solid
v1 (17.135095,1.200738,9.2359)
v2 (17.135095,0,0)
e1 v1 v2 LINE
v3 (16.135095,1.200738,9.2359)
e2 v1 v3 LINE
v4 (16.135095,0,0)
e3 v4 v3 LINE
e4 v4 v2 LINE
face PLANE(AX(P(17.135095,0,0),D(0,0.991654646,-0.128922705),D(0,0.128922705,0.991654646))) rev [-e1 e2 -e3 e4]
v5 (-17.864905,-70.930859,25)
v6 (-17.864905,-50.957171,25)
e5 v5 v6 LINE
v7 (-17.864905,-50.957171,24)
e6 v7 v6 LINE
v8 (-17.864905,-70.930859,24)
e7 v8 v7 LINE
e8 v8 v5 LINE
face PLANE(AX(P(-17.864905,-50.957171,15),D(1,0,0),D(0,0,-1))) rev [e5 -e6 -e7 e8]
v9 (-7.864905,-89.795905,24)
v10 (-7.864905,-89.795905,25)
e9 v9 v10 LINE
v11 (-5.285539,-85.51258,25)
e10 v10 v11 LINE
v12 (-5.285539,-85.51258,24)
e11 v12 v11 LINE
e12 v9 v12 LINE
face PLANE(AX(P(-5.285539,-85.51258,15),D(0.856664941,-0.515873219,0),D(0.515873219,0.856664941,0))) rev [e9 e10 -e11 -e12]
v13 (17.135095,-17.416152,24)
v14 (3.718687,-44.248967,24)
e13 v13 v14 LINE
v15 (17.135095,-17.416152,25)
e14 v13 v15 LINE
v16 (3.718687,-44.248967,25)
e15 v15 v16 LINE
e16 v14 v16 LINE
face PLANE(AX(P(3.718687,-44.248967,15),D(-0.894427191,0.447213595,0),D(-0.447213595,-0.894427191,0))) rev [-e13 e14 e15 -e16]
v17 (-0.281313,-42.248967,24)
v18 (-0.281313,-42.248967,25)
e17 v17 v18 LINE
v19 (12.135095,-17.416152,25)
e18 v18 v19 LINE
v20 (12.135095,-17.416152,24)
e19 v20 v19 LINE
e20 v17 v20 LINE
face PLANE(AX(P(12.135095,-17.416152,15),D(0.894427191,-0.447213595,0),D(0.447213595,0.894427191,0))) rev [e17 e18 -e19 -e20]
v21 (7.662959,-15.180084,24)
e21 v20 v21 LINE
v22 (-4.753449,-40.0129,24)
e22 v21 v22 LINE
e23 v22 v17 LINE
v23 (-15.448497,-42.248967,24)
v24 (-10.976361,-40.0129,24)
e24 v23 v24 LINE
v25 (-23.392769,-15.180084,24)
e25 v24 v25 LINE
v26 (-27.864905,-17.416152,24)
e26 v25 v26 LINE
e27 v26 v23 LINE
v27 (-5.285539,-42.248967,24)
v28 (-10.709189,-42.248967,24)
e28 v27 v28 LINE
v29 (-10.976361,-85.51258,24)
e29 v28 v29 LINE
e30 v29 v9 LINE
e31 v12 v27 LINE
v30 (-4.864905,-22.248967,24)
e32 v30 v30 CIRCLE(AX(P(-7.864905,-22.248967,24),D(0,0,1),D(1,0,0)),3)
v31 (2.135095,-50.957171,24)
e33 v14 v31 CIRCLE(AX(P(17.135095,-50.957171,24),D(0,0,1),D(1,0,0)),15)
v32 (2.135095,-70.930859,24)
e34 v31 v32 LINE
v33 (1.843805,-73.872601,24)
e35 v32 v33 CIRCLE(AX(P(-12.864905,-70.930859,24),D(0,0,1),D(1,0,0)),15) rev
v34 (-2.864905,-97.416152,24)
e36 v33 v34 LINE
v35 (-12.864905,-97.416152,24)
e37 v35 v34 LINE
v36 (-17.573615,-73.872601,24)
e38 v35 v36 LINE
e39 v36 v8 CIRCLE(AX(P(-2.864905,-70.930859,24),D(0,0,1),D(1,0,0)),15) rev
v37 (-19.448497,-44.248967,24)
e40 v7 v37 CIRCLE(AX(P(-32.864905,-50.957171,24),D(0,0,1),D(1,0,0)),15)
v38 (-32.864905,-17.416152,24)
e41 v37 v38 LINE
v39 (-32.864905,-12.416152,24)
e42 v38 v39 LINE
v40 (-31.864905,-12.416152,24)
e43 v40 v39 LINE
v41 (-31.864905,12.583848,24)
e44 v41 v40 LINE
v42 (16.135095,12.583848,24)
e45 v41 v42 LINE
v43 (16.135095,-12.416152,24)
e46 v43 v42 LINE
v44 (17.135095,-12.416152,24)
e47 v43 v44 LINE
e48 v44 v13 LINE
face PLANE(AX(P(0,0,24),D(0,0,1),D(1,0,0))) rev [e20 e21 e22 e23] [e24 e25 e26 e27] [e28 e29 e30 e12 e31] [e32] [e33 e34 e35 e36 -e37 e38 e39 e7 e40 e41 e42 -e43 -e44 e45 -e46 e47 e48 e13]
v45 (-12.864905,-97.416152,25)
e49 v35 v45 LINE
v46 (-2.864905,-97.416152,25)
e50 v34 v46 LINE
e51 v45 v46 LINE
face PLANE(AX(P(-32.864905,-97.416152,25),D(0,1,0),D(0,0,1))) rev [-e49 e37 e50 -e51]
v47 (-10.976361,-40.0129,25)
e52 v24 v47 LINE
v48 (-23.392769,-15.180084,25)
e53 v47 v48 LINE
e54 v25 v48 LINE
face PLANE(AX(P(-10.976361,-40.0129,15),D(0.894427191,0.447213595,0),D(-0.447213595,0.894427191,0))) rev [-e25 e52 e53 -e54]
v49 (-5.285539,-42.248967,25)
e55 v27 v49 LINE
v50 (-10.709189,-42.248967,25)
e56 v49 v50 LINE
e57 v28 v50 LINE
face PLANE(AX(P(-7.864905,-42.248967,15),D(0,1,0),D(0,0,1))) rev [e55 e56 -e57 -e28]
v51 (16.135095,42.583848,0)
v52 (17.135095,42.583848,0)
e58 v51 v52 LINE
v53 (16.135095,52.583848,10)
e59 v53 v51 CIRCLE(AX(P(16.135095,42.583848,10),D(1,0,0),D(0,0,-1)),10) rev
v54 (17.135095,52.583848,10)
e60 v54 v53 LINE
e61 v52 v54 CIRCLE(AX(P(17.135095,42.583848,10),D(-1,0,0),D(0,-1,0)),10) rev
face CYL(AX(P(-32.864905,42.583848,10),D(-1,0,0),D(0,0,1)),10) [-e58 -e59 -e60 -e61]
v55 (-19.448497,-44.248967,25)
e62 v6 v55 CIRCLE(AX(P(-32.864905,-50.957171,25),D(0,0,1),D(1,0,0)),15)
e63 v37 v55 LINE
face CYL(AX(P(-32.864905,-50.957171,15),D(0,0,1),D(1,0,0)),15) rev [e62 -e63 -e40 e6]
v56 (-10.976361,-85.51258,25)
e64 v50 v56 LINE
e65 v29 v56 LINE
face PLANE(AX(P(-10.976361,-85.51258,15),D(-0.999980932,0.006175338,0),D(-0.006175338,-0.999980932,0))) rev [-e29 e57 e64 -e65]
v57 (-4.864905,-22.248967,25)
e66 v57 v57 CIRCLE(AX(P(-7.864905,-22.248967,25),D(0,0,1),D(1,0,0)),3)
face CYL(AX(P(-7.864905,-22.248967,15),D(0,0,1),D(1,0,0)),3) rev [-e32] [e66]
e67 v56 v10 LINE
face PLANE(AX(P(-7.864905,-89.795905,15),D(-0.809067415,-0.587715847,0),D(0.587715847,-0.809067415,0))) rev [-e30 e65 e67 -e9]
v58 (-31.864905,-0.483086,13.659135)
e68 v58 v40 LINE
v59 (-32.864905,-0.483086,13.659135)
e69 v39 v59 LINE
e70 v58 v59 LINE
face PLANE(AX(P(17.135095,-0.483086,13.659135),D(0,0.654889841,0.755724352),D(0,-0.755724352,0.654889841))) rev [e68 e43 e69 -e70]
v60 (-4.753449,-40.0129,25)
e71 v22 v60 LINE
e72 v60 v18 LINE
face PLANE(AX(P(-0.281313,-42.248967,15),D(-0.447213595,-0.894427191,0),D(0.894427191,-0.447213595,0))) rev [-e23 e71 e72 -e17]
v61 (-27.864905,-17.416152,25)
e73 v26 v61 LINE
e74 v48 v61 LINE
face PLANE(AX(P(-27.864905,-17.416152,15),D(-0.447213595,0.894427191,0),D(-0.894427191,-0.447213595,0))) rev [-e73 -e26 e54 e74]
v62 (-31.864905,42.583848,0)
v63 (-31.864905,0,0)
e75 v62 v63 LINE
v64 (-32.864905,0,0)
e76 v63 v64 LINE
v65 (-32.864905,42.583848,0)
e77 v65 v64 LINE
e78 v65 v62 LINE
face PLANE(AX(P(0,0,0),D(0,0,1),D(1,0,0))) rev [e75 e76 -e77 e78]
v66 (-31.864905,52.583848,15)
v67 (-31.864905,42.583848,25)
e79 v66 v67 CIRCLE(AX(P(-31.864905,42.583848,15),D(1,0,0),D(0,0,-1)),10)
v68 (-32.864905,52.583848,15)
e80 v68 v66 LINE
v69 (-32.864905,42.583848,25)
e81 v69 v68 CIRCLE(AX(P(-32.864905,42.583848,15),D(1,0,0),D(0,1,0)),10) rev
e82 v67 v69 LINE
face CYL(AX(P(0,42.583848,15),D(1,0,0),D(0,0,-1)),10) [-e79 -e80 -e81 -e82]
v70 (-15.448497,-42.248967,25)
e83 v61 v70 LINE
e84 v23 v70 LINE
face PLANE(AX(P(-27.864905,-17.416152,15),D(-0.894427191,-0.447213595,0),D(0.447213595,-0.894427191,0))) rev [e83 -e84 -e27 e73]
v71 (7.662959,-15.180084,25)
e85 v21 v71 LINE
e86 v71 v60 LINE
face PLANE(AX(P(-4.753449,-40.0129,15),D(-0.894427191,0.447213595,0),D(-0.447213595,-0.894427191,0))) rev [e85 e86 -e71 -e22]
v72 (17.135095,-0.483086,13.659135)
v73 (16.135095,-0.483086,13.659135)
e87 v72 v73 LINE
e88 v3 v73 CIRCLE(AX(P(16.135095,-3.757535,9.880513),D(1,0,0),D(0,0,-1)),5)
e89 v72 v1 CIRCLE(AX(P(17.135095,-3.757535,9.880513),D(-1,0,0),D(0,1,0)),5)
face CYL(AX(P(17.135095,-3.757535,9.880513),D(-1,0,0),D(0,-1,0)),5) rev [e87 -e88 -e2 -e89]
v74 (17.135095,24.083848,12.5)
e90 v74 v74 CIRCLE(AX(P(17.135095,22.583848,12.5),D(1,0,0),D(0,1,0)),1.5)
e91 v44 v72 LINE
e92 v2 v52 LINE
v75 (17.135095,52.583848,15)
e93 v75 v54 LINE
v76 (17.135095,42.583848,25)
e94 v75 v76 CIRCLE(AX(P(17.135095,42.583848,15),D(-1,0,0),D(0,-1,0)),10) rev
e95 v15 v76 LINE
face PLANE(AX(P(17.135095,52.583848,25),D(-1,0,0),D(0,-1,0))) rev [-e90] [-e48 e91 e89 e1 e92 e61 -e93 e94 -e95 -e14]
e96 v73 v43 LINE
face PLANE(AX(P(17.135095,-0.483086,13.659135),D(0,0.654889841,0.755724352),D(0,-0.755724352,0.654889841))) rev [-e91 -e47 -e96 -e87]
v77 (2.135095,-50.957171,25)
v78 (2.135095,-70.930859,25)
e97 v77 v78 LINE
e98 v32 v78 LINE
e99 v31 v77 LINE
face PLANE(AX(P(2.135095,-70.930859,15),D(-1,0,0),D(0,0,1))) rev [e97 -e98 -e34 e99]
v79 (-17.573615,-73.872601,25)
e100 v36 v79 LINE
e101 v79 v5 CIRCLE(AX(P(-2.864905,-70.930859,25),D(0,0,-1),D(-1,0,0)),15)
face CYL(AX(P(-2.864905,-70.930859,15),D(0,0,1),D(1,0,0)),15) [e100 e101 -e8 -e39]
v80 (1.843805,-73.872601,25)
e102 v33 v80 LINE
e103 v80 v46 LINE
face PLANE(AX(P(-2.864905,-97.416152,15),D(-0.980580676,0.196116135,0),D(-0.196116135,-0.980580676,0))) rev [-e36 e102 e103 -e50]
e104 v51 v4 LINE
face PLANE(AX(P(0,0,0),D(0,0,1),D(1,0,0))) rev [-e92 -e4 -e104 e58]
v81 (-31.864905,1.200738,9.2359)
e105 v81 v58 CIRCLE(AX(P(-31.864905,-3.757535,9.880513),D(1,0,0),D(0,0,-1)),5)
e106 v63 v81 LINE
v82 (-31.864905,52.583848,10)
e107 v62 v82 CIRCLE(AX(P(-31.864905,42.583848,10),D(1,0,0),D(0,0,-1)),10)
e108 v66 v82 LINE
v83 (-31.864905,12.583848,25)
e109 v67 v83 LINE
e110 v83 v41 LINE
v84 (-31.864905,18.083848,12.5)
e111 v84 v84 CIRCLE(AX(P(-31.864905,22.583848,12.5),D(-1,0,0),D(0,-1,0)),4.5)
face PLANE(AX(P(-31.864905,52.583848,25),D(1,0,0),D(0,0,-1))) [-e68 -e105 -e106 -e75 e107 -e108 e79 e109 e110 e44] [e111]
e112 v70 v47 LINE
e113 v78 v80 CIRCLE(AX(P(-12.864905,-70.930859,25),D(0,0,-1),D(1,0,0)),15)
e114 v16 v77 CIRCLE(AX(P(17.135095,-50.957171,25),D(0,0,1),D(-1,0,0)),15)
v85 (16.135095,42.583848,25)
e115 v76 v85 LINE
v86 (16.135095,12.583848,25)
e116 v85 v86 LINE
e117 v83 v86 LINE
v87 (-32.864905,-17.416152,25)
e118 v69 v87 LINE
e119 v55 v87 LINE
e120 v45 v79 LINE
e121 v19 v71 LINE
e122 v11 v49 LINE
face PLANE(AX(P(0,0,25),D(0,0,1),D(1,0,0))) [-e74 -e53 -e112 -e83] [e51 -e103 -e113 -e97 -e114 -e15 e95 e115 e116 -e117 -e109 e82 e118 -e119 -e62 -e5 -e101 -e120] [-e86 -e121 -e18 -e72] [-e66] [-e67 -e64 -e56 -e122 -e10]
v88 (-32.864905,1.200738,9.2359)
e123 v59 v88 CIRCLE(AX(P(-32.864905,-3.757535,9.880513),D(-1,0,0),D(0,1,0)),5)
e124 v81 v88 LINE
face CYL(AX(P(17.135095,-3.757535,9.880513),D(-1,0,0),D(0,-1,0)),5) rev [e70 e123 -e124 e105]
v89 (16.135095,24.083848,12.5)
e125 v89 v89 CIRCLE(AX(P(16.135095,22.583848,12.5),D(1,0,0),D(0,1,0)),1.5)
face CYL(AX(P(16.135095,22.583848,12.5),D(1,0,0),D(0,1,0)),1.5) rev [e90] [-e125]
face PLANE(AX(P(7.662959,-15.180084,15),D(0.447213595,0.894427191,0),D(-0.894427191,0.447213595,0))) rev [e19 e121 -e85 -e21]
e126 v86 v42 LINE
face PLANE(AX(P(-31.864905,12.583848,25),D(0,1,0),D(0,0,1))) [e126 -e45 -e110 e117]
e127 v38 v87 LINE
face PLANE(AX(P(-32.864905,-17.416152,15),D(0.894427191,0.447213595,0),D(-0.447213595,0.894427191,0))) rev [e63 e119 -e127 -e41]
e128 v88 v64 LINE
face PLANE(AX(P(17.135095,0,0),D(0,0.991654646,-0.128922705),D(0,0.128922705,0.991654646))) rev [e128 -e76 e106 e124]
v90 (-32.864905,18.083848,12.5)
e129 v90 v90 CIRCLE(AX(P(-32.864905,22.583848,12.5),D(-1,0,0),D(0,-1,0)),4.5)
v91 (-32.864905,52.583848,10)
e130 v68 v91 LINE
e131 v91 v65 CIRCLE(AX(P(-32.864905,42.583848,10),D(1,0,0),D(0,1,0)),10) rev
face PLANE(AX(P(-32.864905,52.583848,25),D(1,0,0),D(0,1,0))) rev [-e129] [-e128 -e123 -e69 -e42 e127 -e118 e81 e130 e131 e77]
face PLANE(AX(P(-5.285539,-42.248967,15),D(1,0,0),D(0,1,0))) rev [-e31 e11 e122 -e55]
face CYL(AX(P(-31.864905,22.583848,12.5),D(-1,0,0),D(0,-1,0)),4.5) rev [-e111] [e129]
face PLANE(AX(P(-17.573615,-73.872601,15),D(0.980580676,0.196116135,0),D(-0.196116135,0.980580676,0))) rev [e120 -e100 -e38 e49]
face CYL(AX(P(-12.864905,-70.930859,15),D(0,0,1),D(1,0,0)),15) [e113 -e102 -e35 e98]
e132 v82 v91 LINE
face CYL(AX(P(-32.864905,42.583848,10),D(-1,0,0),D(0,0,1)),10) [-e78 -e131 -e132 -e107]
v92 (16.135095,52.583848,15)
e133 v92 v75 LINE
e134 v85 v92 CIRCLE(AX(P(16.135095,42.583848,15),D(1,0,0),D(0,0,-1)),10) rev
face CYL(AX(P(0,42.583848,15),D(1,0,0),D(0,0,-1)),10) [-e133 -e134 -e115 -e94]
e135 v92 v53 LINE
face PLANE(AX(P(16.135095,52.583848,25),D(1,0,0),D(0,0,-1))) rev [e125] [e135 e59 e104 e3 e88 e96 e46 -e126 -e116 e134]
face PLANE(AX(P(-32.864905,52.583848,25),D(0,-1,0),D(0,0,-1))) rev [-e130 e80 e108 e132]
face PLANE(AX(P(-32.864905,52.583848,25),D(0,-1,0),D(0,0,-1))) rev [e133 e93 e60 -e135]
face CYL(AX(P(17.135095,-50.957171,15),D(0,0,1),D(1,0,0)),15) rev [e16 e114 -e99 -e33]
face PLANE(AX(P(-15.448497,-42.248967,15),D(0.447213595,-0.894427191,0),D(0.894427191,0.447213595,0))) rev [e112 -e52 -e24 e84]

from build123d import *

# Parameters (mm, degrees)
CROQUIS2_W              = 50
CROQUIS2_H              = 150
SALIENTE_EXTRUIR1_DEPTH = 25
CROQUIS6_W              = 48
CROQUIS6_H              = 40
CORTAR_EXTRUIR1_DEPTH   = 25
VACIADO2_START          = -31.864905155
VACIADO2_OUTLINE_W      = 110
VACIADO2_OUTLINE_H      = 23
VACIADO2_DEPTH          = 48
CROQUIS8_R              = 4.5
CORTAR_EXTRUIR3_DEPTH   = 1
CROQUIS9_W              = 48
CROQUIS9_H              = 110
CORTAR_EXTRUIR4_DEPTH   = 10
CORTAR_EXTRUIR5_DEPTH   = 1
CORTAR_EXTRUIR6_DEPTH   = 1
CROQUIS12_R             = 1.5
CORTAR_EXTRUIR7_DEPTH   = 1
CROQUIS13_R             = 3
CORTAR_EXTRUIR8_DEPTH   = 10
REDONDEO1_R             = 10
CORTAR_EXTRUIR9_DEPTH   = 50


# Read off the part's stored shape, not the designer's step: Vaciado2
with BuildPart() as part:
    # Croquis2 → Saliente-Extruir1 (new body)
    with BuildSketch(Plane.XY):
        with Locations((-7.864905155, -22.416151752)):
            Rectangle(CROQUIS2_W, CROQUIS2_H)
    extrude(amount=SALIENTE_EXTRUIR1_DEPTH)

    # Croquis6 → Cortar-Extruir1 (cut)
    with BuildSketch(Plane(origin=(0, 0, 0), x_dir=(-1, 0, 0), z_dir=(0, 0, -1))):
        with Locations((7.864905155, 32.583848248)):
            Rectangle(CROQUIS6_W, CROQUIS6_H)
    extrude(amount=-CORTAR_EXTRUIR1_DEPTH, mode=Mode.SUBTRACT)

    # Vaciado2 outline → Vaciado2 (cut)
    with BuildSketch(Plane.YZ.offset(VACIADO2_START)):
        with Locations((-42.416151752, 12.5)):
            Rectangle(VACIADO2_OUTLINE_W, VACIADO2_OUTLINE_H)
    extrude(amount=VACIADO2_DEPTH, mode=Mode.SUBTRACT)

    # Croquis8 → Cortar-Extruir3 (cut)
    with BuildSketch(Plane.ZY.offset(32.864905155)):
        with Locations(Location((12.5, 22.583848248, 0), (0, 0, 270))):
            Circle(CROQUIS8_R)
    extrude(amount=-CORTAR_EXTRUIR3_DEPTH, mode=Mode.SUBTRACT)

    # Croquis9 → Cortar-Extruir4 (cut)
    with BuildSketch(Plane(origin=(0, 0, 0), x_dir=(-1, 0, 0), z_dir=(0, 0, -1))):
        with Locations((7.864905155, -42.416151752)):
            Rectangle(CROQUIS9_W, CROQUIS9_H)
    extrude(amount=-CORTAR_EXTRUIR4_DEPTH, mode=Mode.SUBTRACT)

    # Croquis10 → Cortar-Extruir5 (cut)
    with BuildSketch(Plane.ZY.offset(32.864905155)):
        Polygon((0, 0), (24, -12.416151752), (24, -97.416151752), (0, -97.416151752), align=None)
    extrude(amount=-CORTAR_EXTRUIR5_DEPTH, mode=Mode.SUBTRACT)

    # Croquis11 → Cortar-Extruir6 (cut)
    with BuildSketch(Plane(origin=(17.135094845, 0, 0), x_dir=(0, 0, -1), z_dir=(1, 0, 0))):
        Polygon((0, 0), (-24, -12.416151752), (-24, -97.416151752), (0, -97.416151752), align=None)
    extrude(amount=-CORTAR_EXTRUIR6_DEPTH, mode=Mode.SUBTRACT)

    # Croquis12 → Cortar-Extruir7 (cut)
    with BuildSketch(Plane(origin=(17.135094845, 0, 0), x_dir=(0, 0, -1), z_dir=(1, 0, 0))):
        with Locations(Location((-12.5, 22.583848248, 0), (0, 0, 90))):
            Circle(CROQUIS12_R)
    extrude(amount=-CORTAR_EXTRUIR7_DEPTH, mode=Mode.SUBTRACT)

    # Croquis13 → Cortar-Extruir8 (cut)
    with BuildSketch(Plane.XY.offset(25)):
        with Locations((-7.864905155, -22.248967482)):
            Circle(CROQUIS13_R)
        with BuildLine():
            Line((-17.864905155, -50.957171414), (-17.864905155, -70.930859048))
            ThreePointArc((-17.864905155, -70.930859048), (-17.791905055, -72.408923317), (-17.57361529, -73.872601075))
            Line((-17.57361529, -73.872601075), (-12.864905155, -97.416151752))
            Line((-12.864905155, -97.416151752), (-32.864905155, -97.416151752))
            Line((-32.864905155, -97.416151752), (-32.864905155, -17.416151752))
            Line((-32.864905155, -17.416151752), (-19.44849729, -44.248967482))
            ThreePointArc((-19.44849729, -44.248967482), (-18.266170313, -47.510877606), (-17.864905155, -50.957171414))
        make_face()
        Polygon((-27.864905155, -17.416151752), (-23.3927692, -15.180083774), (-10.976361335, -40.012899504), (-15.44849729, -42.248967482), align=None)
        with BuildLine():
            Line((-2.864905155, -97.416151752), (1.84380498, -73.872601075))
            ThreePointArc((1.84380498, -73.872601075), (2.062094745, -72.408923317), (2.135094845, -70.930859048))
            Line((2.135094845, -70.930859048), (2.135094845, -50.957171414))
            ThreePointArc((2.135094845, -50.957171414), (2.536360003, -47.510877606), (3.71868698, -44.248967482))
            Line((3.71868698, -44.248967482), (17.135094845, -17.416151752))
            Line((17.135094845, -17.416151752), (17.135094845, -97.416151752))
            Line((17.135094845, -97.416151752), (-2.864905155, -97.416151752))
        make_face()
        Polygon((12.135094845, -17.416151752), (-0.28131302, -42.248967482), (-4.753448975, -40.012899504), (7.66295889, -15.180083774), align=None)
        Polygon((-7.864905155, -42.248967482), (-5.285539059, -42.248967482), (-5.285539059, -85.512580171), (-7.864905155, -89.795904878), (-10.976361335, -85.512580171), (-10.709188819, -42.248967482), align=None)
    extrude(amount=-CORTAR_EXTRUIR8_DEPTH, mode=Mode.SUBTRACT)

    # Redondeo1
    redondeo1_edges = [part.edges().sort_by_distance(p)[0] for p in [
        (16.635094845, 52.583848248, 25),
        (-32.364905155, 52.583848248, 0),
        (-32.364905155, 52.583848248, 25),
        (16.635094845, 52.583848248, 0),
    ]]
    fillet(redondeo1_edges, radius=REDONDEO1_R)

    # Croquis14 → Cortar-Extruir9 (cut)
    with BuildSketch(Plane.ZY.offset(32.864905155)):
        with BuildLine():
            Line((0, 0), (9.235899895, 1.20073778))
            ThreePointArc((9.235899895, 1.20073778), (11.659366349, 0.915331151), (13.659135181, -0.483086245))
            Line((13.659135181, -0.483086245), (24, -12.416151752))
            Line((24, -12.416151752), (0, 0))
        make_face()
    extrude(amount=-CORTAR_EXTRUIR9_DEPTH, mode=Mode.SUBTRACT)


solid = part.part
